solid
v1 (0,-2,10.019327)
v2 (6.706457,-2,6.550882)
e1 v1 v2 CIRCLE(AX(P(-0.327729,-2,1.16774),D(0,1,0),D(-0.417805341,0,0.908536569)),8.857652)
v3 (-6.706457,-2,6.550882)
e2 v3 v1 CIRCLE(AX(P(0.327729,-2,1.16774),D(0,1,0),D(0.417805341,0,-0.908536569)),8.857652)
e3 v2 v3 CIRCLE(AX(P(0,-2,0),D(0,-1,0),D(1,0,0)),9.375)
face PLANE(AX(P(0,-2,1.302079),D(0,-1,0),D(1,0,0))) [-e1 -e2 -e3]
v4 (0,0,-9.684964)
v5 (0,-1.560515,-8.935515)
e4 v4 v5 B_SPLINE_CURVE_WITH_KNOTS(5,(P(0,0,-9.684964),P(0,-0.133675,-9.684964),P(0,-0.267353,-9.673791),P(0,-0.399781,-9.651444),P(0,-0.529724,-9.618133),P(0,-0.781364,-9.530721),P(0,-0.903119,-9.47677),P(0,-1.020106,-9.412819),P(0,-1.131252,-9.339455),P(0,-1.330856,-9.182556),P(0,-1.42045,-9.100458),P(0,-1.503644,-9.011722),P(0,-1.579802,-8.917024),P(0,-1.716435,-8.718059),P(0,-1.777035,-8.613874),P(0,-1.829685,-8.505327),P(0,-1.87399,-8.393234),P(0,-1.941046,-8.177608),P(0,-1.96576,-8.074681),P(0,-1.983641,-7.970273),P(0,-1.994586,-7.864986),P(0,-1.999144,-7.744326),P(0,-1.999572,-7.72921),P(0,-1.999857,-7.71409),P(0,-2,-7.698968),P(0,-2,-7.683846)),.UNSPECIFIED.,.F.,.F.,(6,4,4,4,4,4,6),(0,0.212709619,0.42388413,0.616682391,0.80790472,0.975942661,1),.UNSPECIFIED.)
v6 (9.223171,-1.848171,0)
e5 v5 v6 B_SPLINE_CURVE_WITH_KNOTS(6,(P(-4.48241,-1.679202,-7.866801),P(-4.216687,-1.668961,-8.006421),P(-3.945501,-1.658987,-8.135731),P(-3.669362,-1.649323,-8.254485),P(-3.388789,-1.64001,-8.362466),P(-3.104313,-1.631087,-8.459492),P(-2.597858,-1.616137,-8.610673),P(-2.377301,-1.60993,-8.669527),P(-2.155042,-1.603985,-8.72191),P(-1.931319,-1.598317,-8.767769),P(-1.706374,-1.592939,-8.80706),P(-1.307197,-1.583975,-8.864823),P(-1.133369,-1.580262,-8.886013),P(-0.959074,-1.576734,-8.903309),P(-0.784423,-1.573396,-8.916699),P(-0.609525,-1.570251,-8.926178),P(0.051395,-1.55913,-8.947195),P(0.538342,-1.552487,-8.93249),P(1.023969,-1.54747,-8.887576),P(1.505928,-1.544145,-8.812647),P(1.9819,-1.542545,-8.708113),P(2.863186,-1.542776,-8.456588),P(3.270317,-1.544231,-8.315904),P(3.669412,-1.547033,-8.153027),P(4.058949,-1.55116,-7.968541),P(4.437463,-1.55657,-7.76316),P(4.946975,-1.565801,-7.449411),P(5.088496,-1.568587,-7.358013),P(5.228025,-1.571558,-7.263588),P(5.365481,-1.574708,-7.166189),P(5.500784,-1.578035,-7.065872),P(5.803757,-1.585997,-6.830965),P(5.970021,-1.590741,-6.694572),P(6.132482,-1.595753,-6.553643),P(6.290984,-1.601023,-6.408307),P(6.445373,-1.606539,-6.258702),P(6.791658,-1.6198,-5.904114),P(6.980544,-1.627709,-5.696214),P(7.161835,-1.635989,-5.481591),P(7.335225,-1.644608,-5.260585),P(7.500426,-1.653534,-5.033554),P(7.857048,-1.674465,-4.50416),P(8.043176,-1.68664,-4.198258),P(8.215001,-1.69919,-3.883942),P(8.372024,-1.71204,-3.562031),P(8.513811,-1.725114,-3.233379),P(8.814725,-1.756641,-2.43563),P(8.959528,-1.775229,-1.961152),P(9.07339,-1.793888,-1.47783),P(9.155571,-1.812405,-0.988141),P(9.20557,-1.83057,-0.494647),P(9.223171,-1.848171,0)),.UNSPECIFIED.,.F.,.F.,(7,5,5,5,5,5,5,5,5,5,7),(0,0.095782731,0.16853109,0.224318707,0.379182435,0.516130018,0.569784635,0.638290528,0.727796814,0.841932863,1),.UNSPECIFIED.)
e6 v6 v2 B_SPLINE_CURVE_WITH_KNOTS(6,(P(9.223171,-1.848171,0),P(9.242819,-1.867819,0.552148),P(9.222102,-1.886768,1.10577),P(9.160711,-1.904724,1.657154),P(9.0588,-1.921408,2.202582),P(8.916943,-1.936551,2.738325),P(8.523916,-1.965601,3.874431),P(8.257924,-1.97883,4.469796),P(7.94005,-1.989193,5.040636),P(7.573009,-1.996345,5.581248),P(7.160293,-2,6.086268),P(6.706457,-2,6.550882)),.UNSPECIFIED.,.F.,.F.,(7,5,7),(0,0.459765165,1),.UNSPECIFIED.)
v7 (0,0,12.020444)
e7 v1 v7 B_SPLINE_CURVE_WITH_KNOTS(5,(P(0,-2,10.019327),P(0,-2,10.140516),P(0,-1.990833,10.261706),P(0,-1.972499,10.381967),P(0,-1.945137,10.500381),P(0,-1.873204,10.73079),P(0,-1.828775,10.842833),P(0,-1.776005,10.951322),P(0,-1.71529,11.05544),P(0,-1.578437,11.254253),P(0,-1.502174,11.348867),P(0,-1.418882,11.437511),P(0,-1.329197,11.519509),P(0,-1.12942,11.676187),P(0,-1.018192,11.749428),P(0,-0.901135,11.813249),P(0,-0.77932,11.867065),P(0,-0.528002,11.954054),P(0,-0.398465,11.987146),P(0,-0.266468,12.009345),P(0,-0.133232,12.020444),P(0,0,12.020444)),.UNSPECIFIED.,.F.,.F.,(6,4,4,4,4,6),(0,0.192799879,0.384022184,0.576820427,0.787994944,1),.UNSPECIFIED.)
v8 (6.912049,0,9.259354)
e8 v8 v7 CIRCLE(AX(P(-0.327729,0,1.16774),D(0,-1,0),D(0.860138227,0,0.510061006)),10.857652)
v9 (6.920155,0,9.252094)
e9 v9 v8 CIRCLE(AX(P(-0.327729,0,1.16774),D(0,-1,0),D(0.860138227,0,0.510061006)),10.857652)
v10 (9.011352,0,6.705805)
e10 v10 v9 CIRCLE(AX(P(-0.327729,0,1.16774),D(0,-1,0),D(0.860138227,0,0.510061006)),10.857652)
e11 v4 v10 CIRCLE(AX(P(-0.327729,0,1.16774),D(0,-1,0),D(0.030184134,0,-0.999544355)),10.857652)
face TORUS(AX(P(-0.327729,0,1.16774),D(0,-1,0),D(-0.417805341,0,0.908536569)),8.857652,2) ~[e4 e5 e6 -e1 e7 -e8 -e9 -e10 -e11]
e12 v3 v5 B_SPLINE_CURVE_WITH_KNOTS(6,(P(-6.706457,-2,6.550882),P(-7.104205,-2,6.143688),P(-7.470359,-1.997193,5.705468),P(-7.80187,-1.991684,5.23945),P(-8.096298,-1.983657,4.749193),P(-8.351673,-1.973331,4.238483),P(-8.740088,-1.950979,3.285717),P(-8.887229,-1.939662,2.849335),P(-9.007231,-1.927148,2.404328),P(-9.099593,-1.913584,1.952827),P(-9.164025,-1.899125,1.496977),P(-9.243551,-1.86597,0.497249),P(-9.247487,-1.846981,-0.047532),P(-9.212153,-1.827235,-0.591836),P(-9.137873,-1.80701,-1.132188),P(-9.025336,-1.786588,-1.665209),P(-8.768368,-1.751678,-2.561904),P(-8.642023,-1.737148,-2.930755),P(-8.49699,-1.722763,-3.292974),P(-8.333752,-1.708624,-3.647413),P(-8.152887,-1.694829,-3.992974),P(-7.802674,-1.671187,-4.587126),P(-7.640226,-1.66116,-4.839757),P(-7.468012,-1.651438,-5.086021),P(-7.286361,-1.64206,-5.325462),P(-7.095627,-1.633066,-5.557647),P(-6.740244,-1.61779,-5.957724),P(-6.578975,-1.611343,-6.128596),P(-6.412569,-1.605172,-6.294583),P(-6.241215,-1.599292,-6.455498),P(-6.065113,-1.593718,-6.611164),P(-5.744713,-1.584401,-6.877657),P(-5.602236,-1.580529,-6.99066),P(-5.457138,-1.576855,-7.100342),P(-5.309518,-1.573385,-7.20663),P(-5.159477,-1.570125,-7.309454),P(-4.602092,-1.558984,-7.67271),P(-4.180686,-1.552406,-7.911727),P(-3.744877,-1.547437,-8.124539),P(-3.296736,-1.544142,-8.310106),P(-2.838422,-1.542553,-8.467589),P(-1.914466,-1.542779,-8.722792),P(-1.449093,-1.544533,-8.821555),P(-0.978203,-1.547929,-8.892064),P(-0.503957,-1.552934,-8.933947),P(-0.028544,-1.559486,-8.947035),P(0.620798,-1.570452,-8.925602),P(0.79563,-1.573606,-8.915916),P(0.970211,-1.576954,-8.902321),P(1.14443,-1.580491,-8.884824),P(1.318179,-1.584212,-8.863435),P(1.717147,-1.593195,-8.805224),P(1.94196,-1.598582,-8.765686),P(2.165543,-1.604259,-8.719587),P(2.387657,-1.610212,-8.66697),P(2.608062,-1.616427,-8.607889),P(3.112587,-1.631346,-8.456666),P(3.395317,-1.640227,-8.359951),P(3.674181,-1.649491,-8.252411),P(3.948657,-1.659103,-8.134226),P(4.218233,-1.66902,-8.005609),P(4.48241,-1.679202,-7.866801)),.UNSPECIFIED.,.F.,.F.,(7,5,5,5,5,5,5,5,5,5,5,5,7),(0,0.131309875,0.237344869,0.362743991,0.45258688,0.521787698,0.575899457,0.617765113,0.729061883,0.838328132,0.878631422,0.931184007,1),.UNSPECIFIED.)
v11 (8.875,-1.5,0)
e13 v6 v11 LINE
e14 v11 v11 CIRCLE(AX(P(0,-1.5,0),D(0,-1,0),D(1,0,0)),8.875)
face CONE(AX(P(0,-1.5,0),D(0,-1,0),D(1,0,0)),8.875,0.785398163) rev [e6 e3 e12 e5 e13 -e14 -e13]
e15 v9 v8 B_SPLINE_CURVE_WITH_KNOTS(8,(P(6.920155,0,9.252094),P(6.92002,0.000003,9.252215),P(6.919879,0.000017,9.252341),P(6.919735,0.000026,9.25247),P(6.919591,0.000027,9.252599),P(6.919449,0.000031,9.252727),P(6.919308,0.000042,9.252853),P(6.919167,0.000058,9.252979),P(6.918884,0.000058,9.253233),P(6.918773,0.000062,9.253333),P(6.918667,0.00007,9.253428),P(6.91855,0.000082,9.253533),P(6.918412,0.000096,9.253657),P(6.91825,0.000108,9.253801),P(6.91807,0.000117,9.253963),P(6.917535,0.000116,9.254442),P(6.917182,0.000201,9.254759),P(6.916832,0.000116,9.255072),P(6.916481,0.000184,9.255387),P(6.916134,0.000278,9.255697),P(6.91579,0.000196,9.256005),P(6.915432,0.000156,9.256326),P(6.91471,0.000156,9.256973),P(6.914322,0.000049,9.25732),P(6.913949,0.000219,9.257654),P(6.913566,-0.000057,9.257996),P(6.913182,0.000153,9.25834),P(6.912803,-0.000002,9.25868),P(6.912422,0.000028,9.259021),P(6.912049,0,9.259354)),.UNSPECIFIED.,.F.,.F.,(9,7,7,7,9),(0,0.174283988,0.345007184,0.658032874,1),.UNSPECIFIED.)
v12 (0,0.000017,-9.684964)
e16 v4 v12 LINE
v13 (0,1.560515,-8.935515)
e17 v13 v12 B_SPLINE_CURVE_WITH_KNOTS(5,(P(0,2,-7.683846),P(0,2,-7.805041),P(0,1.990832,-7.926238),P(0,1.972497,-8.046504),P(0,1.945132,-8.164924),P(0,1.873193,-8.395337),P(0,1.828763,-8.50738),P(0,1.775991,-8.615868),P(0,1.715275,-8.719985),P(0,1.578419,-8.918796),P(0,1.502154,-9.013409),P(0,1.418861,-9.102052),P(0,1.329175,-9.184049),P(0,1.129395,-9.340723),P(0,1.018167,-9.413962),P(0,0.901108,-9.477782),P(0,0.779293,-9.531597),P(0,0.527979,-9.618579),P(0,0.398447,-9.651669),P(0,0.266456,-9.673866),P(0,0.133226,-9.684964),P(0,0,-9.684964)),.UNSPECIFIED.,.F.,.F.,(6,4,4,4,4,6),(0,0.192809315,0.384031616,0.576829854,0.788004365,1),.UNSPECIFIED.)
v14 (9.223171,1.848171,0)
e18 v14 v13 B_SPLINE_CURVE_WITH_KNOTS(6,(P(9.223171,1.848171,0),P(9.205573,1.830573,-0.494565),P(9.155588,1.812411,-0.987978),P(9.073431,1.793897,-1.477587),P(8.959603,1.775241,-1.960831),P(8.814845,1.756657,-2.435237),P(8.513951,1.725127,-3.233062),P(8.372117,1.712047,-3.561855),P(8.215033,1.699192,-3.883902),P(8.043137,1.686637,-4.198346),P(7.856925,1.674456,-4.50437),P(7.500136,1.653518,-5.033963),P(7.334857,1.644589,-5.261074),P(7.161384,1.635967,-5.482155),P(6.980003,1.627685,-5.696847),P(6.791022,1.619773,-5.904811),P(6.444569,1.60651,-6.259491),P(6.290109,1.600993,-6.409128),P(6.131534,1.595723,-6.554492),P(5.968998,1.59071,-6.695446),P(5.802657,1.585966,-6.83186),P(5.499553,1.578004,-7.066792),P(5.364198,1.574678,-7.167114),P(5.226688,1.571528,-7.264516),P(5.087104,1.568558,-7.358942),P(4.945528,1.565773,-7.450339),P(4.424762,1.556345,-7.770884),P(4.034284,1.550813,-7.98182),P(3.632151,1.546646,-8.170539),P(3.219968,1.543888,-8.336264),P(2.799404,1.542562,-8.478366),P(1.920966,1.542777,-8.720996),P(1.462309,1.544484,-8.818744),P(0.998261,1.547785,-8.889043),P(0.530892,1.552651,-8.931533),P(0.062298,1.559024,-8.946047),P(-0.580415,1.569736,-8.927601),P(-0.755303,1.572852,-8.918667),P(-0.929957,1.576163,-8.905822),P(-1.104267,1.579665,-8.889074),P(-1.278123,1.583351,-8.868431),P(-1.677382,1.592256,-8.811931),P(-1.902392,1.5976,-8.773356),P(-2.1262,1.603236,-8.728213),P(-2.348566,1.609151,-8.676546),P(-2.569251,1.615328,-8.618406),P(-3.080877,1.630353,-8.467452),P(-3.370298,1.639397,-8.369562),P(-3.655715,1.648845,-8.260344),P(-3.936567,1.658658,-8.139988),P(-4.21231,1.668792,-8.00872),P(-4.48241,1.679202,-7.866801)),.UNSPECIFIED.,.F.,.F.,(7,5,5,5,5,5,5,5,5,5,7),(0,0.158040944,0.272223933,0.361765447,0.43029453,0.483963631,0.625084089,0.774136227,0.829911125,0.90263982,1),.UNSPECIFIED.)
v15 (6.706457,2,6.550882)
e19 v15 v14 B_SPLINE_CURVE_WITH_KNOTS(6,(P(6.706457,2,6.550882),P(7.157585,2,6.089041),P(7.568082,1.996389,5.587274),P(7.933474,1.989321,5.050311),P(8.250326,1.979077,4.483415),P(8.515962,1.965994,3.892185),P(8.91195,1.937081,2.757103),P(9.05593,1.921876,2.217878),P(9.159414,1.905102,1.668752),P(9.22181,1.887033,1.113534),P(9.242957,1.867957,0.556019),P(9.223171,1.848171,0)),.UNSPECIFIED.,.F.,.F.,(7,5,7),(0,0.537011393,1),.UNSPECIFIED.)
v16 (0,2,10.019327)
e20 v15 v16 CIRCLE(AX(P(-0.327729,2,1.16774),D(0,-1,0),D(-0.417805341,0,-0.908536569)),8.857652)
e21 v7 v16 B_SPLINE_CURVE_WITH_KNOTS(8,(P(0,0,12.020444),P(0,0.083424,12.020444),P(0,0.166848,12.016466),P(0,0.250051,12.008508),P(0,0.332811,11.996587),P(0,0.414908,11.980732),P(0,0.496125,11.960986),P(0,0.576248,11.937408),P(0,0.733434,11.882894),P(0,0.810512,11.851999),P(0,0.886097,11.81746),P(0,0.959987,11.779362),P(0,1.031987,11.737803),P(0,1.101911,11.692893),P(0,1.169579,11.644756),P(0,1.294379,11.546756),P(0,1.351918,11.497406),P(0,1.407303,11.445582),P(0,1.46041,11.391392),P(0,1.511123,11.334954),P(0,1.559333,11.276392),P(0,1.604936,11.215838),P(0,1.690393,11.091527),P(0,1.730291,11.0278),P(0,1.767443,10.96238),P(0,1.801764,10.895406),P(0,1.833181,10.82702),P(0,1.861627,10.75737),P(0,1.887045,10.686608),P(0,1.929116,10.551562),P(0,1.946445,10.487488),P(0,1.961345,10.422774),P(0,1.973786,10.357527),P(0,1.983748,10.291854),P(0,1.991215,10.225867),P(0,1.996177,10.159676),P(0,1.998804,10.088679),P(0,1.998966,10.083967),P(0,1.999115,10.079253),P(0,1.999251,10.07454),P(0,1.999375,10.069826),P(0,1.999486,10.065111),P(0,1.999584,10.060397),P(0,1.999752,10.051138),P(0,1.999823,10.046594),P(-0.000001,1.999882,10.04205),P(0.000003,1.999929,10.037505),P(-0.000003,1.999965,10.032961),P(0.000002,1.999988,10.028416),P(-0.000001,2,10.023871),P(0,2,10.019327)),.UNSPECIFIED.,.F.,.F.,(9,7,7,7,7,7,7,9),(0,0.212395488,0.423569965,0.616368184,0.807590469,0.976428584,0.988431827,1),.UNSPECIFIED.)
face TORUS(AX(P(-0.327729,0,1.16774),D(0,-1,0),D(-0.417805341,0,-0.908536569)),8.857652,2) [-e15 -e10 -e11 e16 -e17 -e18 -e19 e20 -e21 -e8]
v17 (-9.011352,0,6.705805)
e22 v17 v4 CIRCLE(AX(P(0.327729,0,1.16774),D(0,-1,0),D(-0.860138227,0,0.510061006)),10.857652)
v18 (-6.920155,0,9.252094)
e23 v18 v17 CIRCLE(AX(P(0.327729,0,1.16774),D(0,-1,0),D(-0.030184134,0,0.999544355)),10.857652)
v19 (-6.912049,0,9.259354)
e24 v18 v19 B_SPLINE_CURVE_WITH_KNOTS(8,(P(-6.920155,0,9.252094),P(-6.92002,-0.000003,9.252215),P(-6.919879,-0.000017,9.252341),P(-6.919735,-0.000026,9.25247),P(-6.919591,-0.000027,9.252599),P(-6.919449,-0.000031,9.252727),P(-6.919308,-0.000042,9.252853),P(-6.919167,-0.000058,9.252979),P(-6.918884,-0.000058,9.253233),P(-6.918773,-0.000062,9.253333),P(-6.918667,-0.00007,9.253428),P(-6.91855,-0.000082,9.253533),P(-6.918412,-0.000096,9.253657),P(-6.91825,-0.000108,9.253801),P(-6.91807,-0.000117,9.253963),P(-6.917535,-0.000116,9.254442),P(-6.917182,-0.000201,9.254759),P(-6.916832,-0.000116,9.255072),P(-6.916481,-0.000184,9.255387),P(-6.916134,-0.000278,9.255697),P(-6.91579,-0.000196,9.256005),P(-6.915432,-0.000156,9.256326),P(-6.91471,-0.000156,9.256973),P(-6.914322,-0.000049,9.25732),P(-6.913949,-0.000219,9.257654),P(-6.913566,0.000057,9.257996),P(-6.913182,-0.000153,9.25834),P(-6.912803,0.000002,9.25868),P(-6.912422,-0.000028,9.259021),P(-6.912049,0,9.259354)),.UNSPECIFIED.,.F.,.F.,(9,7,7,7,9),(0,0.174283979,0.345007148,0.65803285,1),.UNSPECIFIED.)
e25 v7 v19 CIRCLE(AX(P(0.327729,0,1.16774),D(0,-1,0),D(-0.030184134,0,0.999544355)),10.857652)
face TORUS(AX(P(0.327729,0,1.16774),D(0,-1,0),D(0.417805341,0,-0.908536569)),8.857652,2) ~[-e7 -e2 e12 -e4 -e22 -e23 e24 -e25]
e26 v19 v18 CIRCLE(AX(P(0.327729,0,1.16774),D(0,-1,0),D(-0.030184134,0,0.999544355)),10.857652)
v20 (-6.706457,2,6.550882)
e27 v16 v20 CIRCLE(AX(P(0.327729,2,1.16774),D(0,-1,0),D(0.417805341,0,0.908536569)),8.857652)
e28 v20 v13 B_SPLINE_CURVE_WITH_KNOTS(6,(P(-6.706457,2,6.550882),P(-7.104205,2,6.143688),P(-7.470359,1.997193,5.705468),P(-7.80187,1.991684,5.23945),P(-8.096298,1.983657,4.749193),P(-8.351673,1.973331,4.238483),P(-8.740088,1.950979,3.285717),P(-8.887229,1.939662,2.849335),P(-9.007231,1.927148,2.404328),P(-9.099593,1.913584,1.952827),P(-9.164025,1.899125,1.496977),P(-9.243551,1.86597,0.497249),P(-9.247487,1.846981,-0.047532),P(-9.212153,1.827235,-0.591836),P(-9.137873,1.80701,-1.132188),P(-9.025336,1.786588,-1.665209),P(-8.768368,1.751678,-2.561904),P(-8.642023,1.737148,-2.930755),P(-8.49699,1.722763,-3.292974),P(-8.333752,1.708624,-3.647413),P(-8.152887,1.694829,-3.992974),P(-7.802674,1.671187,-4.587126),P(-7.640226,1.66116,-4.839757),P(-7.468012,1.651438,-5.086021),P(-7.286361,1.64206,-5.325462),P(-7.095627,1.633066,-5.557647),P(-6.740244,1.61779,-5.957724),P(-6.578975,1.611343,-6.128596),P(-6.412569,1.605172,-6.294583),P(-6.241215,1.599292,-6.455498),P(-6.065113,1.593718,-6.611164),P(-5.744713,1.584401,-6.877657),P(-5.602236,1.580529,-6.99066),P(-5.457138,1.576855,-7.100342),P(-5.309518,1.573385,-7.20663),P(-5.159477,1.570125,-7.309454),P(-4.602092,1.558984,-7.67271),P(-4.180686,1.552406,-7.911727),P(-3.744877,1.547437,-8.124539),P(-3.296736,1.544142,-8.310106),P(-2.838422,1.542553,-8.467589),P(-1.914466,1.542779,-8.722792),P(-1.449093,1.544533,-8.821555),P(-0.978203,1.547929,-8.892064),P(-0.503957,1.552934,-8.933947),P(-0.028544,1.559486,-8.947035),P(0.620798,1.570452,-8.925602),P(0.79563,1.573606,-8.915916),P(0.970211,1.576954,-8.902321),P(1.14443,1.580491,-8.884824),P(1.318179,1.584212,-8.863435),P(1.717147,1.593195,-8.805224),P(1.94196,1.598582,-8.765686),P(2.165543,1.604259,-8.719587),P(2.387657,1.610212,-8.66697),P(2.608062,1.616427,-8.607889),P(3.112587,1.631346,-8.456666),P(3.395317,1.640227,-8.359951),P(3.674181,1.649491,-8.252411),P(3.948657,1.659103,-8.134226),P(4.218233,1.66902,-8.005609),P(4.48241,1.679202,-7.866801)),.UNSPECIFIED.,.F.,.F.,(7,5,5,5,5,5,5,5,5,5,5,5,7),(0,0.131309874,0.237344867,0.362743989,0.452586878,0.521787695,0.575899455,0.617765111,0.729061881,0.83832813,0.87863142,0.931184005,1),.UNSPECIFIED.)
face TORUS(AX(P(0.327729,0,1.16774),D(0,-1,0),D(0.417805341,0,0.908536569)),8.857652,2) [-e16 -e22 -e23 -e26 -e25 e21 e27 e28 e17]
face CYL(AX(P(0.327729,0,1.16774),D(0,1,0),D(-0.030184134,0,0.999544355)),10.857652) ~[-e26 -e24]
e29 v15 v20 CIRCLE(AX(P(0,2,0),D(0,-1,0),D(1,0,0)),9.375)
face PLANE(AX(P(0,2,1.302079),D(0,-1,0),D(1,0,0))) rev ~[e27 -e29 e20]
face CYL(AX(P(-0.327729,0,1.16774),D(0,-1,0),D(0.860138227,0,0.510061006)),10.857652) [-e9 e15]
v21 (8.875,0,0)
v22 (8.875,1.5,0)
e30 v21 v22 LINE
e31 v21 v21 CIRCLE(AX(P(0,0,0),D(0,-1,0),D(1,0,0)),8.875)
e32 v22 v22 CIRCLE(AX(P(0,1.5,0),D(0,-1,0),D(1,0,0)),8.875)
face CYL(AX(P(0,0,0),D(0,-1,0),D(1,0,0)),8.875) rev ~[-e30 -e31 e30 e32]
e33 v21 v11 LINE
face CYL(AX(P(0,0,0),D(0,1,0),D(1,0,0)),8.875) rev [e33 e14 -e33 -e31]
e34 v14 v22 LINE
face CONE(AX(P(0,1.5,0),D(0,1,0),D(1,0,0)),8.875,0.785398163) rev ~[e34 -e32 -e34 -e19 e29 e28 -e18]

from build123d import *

# Parameters (mm, degrees)
F0_R          = 8.875
F1_DEPTH      = 2
F1_DEPTH_BACK = 2
F2_SIZE       = 0.5
F3_T2_ANGLE   = 229.39221369
F3_T4_ANGLE   = 229.39221369
F3_T6_ANGLE   = 229.39221369
F3_T8_ANGLE   = 229.39221369


# Not quite as in the source:
# - a fillet or chamfer that OpenCascade refuses, or shapes differently, is made with other operations: its cross-section is extruded or revolved along the edge and cut away or added


with BuildPart() as f1:
    # F0 (on Front) → F1 (new body, two sides)
    with BuildSketch(Plane.XZ) as f1_sk:
        with BuildLine():
            ThreePointArc((9.0113523195, 6.7058048682), (5.1879898372, 10.5200364151), (0, 12.0204444975))
            ThreePointArc((0, 12.0204444975), (-5.1879898372, 10.5200364151), (-9.0113523195, 6.7058048682))
            ThreePointArc((-9.0113523195, 6.7058048682), (-9.186793263, -4.0631742687), (0, -9.6849640831))
            ThreePointArc((0, -9.6849640831), (9.186793263, -4.0631742687), (9.0113523195, 6.7058048682))
        make_face()
        Circle(F0_R, mode=Mode.SUBTRACT)
    extrude(amount=F1_DEPTH)
    extrude(f1_sk.sketch, amount=-F1_DEPTH_BACK)

    # F2
    f2_edges = [f1.edges().sort_by_distance(p)[0] for p in [
        (-8.875, 2, 0),
        (-8.875, -2, 0),
    ]]
    chamfer(f2_edges, length=F2_SIZE)

    # F3: fillet of radius 2 on 4 edges, made by hand

    # F3_s1 → F3_t2 (revolve, cut)
    with BuildSketch(Plane(origin=(-0.7137842207, 0, 0.3282453014), x_dir=(0, 1, 0), z_dir=(-0.9085365688, 0, 0.4178053412))):
        with BuildLine():
            ThreePointArc((2, 7.9336436901), (1.4142135624, 9.3478572525), (0, 9.9336436901))
            Line((0, 9.9336436901), (2, 9.9336436901))
            Line((2, 9.9336436901), (2, 7.9336436901))
        make_face()
    revolve(axis=Axis((-0.3277288129, 2, 1.1677402072), (0, -1, 0)), revolution_arc=F3_T2_ANGLE, mode=Mode.SUBTRACT)

    # F3_s3 → F3_t4 (revolve, cut)
    with BuildSketch(Plane(origin=(-0.1727441321, 0, 0.0794392031), x_dir=(0, 1, 0), z_dir=(0.9085365688, 0, -0.4178053412))):
        with BuildLine():
            ThreePointArc((2, 10.0555130523), (1.4142135624, 11.4697266146), (0, 12.0555130523))
            Line((0, 12.0555130523), (2, 12.0555130523))
            Line((2, 12.0555130523), (2, 10.0555130523))
        make_face()
    revolve(axis=Axis((0.3277288129, 2, 1.1677402072), (0, -1, 0)), revolution_arc=F3_T4_ANGLE, mode=Mode.SUBTRACT)

    # F3_s5 → F3_t6 (revolve, cut)
    with BuildSketch(Plane(origin=(0.1727441321, 0, 0.0794392031), x_dir=(0, 1, 0), z_dir=(-0.9085365688, 0, -0.4178053412))):
        with BuildLine():
            ThreePointArc((0, -12.0555130523), (-1.4142135624, -11.4697266146), (-2, -10.0555130523))
            Line((-2, -10.0555130523), (-2, -12.0555130523))
            Line((-2, -12.0555130523), (0, -12.0555130523))
        make_face()
    revolve(axis=Axis((-0.3277288129, -2, 1.1677402072), (0, 1, 0)), revolution_arc=F3_T6_ANGLE, mode=Mode.SUBTRACT)

    # F3_s7 → F3_t8 (revolve, cut)
    with BuildSketch(Plane(origin=(0.7137842207, 0, 0.3282453014), x_dir=(0, 1, 0), z_dir=(0.9085365688, 0, 0.4178053412))):
        with BuildLine():
            ThreePointArc((0, -9.9336436901), (-1.4142135624, -9.3478572525), (-2, -7.9336436901))
            Line((-2, -7.9336436901), (-2, -9.9336436901))
            Line((-2, -9.9336436901), (0, -9.9336436901))
        make_face()
    revolve(axis=Axis((0.3277288129, -2, 1.1677402072), (0, 1, 0)), revolution_arc=F3_T8_ANGLE, mode=Mode.SUBTRACT)


solid = f1.part
